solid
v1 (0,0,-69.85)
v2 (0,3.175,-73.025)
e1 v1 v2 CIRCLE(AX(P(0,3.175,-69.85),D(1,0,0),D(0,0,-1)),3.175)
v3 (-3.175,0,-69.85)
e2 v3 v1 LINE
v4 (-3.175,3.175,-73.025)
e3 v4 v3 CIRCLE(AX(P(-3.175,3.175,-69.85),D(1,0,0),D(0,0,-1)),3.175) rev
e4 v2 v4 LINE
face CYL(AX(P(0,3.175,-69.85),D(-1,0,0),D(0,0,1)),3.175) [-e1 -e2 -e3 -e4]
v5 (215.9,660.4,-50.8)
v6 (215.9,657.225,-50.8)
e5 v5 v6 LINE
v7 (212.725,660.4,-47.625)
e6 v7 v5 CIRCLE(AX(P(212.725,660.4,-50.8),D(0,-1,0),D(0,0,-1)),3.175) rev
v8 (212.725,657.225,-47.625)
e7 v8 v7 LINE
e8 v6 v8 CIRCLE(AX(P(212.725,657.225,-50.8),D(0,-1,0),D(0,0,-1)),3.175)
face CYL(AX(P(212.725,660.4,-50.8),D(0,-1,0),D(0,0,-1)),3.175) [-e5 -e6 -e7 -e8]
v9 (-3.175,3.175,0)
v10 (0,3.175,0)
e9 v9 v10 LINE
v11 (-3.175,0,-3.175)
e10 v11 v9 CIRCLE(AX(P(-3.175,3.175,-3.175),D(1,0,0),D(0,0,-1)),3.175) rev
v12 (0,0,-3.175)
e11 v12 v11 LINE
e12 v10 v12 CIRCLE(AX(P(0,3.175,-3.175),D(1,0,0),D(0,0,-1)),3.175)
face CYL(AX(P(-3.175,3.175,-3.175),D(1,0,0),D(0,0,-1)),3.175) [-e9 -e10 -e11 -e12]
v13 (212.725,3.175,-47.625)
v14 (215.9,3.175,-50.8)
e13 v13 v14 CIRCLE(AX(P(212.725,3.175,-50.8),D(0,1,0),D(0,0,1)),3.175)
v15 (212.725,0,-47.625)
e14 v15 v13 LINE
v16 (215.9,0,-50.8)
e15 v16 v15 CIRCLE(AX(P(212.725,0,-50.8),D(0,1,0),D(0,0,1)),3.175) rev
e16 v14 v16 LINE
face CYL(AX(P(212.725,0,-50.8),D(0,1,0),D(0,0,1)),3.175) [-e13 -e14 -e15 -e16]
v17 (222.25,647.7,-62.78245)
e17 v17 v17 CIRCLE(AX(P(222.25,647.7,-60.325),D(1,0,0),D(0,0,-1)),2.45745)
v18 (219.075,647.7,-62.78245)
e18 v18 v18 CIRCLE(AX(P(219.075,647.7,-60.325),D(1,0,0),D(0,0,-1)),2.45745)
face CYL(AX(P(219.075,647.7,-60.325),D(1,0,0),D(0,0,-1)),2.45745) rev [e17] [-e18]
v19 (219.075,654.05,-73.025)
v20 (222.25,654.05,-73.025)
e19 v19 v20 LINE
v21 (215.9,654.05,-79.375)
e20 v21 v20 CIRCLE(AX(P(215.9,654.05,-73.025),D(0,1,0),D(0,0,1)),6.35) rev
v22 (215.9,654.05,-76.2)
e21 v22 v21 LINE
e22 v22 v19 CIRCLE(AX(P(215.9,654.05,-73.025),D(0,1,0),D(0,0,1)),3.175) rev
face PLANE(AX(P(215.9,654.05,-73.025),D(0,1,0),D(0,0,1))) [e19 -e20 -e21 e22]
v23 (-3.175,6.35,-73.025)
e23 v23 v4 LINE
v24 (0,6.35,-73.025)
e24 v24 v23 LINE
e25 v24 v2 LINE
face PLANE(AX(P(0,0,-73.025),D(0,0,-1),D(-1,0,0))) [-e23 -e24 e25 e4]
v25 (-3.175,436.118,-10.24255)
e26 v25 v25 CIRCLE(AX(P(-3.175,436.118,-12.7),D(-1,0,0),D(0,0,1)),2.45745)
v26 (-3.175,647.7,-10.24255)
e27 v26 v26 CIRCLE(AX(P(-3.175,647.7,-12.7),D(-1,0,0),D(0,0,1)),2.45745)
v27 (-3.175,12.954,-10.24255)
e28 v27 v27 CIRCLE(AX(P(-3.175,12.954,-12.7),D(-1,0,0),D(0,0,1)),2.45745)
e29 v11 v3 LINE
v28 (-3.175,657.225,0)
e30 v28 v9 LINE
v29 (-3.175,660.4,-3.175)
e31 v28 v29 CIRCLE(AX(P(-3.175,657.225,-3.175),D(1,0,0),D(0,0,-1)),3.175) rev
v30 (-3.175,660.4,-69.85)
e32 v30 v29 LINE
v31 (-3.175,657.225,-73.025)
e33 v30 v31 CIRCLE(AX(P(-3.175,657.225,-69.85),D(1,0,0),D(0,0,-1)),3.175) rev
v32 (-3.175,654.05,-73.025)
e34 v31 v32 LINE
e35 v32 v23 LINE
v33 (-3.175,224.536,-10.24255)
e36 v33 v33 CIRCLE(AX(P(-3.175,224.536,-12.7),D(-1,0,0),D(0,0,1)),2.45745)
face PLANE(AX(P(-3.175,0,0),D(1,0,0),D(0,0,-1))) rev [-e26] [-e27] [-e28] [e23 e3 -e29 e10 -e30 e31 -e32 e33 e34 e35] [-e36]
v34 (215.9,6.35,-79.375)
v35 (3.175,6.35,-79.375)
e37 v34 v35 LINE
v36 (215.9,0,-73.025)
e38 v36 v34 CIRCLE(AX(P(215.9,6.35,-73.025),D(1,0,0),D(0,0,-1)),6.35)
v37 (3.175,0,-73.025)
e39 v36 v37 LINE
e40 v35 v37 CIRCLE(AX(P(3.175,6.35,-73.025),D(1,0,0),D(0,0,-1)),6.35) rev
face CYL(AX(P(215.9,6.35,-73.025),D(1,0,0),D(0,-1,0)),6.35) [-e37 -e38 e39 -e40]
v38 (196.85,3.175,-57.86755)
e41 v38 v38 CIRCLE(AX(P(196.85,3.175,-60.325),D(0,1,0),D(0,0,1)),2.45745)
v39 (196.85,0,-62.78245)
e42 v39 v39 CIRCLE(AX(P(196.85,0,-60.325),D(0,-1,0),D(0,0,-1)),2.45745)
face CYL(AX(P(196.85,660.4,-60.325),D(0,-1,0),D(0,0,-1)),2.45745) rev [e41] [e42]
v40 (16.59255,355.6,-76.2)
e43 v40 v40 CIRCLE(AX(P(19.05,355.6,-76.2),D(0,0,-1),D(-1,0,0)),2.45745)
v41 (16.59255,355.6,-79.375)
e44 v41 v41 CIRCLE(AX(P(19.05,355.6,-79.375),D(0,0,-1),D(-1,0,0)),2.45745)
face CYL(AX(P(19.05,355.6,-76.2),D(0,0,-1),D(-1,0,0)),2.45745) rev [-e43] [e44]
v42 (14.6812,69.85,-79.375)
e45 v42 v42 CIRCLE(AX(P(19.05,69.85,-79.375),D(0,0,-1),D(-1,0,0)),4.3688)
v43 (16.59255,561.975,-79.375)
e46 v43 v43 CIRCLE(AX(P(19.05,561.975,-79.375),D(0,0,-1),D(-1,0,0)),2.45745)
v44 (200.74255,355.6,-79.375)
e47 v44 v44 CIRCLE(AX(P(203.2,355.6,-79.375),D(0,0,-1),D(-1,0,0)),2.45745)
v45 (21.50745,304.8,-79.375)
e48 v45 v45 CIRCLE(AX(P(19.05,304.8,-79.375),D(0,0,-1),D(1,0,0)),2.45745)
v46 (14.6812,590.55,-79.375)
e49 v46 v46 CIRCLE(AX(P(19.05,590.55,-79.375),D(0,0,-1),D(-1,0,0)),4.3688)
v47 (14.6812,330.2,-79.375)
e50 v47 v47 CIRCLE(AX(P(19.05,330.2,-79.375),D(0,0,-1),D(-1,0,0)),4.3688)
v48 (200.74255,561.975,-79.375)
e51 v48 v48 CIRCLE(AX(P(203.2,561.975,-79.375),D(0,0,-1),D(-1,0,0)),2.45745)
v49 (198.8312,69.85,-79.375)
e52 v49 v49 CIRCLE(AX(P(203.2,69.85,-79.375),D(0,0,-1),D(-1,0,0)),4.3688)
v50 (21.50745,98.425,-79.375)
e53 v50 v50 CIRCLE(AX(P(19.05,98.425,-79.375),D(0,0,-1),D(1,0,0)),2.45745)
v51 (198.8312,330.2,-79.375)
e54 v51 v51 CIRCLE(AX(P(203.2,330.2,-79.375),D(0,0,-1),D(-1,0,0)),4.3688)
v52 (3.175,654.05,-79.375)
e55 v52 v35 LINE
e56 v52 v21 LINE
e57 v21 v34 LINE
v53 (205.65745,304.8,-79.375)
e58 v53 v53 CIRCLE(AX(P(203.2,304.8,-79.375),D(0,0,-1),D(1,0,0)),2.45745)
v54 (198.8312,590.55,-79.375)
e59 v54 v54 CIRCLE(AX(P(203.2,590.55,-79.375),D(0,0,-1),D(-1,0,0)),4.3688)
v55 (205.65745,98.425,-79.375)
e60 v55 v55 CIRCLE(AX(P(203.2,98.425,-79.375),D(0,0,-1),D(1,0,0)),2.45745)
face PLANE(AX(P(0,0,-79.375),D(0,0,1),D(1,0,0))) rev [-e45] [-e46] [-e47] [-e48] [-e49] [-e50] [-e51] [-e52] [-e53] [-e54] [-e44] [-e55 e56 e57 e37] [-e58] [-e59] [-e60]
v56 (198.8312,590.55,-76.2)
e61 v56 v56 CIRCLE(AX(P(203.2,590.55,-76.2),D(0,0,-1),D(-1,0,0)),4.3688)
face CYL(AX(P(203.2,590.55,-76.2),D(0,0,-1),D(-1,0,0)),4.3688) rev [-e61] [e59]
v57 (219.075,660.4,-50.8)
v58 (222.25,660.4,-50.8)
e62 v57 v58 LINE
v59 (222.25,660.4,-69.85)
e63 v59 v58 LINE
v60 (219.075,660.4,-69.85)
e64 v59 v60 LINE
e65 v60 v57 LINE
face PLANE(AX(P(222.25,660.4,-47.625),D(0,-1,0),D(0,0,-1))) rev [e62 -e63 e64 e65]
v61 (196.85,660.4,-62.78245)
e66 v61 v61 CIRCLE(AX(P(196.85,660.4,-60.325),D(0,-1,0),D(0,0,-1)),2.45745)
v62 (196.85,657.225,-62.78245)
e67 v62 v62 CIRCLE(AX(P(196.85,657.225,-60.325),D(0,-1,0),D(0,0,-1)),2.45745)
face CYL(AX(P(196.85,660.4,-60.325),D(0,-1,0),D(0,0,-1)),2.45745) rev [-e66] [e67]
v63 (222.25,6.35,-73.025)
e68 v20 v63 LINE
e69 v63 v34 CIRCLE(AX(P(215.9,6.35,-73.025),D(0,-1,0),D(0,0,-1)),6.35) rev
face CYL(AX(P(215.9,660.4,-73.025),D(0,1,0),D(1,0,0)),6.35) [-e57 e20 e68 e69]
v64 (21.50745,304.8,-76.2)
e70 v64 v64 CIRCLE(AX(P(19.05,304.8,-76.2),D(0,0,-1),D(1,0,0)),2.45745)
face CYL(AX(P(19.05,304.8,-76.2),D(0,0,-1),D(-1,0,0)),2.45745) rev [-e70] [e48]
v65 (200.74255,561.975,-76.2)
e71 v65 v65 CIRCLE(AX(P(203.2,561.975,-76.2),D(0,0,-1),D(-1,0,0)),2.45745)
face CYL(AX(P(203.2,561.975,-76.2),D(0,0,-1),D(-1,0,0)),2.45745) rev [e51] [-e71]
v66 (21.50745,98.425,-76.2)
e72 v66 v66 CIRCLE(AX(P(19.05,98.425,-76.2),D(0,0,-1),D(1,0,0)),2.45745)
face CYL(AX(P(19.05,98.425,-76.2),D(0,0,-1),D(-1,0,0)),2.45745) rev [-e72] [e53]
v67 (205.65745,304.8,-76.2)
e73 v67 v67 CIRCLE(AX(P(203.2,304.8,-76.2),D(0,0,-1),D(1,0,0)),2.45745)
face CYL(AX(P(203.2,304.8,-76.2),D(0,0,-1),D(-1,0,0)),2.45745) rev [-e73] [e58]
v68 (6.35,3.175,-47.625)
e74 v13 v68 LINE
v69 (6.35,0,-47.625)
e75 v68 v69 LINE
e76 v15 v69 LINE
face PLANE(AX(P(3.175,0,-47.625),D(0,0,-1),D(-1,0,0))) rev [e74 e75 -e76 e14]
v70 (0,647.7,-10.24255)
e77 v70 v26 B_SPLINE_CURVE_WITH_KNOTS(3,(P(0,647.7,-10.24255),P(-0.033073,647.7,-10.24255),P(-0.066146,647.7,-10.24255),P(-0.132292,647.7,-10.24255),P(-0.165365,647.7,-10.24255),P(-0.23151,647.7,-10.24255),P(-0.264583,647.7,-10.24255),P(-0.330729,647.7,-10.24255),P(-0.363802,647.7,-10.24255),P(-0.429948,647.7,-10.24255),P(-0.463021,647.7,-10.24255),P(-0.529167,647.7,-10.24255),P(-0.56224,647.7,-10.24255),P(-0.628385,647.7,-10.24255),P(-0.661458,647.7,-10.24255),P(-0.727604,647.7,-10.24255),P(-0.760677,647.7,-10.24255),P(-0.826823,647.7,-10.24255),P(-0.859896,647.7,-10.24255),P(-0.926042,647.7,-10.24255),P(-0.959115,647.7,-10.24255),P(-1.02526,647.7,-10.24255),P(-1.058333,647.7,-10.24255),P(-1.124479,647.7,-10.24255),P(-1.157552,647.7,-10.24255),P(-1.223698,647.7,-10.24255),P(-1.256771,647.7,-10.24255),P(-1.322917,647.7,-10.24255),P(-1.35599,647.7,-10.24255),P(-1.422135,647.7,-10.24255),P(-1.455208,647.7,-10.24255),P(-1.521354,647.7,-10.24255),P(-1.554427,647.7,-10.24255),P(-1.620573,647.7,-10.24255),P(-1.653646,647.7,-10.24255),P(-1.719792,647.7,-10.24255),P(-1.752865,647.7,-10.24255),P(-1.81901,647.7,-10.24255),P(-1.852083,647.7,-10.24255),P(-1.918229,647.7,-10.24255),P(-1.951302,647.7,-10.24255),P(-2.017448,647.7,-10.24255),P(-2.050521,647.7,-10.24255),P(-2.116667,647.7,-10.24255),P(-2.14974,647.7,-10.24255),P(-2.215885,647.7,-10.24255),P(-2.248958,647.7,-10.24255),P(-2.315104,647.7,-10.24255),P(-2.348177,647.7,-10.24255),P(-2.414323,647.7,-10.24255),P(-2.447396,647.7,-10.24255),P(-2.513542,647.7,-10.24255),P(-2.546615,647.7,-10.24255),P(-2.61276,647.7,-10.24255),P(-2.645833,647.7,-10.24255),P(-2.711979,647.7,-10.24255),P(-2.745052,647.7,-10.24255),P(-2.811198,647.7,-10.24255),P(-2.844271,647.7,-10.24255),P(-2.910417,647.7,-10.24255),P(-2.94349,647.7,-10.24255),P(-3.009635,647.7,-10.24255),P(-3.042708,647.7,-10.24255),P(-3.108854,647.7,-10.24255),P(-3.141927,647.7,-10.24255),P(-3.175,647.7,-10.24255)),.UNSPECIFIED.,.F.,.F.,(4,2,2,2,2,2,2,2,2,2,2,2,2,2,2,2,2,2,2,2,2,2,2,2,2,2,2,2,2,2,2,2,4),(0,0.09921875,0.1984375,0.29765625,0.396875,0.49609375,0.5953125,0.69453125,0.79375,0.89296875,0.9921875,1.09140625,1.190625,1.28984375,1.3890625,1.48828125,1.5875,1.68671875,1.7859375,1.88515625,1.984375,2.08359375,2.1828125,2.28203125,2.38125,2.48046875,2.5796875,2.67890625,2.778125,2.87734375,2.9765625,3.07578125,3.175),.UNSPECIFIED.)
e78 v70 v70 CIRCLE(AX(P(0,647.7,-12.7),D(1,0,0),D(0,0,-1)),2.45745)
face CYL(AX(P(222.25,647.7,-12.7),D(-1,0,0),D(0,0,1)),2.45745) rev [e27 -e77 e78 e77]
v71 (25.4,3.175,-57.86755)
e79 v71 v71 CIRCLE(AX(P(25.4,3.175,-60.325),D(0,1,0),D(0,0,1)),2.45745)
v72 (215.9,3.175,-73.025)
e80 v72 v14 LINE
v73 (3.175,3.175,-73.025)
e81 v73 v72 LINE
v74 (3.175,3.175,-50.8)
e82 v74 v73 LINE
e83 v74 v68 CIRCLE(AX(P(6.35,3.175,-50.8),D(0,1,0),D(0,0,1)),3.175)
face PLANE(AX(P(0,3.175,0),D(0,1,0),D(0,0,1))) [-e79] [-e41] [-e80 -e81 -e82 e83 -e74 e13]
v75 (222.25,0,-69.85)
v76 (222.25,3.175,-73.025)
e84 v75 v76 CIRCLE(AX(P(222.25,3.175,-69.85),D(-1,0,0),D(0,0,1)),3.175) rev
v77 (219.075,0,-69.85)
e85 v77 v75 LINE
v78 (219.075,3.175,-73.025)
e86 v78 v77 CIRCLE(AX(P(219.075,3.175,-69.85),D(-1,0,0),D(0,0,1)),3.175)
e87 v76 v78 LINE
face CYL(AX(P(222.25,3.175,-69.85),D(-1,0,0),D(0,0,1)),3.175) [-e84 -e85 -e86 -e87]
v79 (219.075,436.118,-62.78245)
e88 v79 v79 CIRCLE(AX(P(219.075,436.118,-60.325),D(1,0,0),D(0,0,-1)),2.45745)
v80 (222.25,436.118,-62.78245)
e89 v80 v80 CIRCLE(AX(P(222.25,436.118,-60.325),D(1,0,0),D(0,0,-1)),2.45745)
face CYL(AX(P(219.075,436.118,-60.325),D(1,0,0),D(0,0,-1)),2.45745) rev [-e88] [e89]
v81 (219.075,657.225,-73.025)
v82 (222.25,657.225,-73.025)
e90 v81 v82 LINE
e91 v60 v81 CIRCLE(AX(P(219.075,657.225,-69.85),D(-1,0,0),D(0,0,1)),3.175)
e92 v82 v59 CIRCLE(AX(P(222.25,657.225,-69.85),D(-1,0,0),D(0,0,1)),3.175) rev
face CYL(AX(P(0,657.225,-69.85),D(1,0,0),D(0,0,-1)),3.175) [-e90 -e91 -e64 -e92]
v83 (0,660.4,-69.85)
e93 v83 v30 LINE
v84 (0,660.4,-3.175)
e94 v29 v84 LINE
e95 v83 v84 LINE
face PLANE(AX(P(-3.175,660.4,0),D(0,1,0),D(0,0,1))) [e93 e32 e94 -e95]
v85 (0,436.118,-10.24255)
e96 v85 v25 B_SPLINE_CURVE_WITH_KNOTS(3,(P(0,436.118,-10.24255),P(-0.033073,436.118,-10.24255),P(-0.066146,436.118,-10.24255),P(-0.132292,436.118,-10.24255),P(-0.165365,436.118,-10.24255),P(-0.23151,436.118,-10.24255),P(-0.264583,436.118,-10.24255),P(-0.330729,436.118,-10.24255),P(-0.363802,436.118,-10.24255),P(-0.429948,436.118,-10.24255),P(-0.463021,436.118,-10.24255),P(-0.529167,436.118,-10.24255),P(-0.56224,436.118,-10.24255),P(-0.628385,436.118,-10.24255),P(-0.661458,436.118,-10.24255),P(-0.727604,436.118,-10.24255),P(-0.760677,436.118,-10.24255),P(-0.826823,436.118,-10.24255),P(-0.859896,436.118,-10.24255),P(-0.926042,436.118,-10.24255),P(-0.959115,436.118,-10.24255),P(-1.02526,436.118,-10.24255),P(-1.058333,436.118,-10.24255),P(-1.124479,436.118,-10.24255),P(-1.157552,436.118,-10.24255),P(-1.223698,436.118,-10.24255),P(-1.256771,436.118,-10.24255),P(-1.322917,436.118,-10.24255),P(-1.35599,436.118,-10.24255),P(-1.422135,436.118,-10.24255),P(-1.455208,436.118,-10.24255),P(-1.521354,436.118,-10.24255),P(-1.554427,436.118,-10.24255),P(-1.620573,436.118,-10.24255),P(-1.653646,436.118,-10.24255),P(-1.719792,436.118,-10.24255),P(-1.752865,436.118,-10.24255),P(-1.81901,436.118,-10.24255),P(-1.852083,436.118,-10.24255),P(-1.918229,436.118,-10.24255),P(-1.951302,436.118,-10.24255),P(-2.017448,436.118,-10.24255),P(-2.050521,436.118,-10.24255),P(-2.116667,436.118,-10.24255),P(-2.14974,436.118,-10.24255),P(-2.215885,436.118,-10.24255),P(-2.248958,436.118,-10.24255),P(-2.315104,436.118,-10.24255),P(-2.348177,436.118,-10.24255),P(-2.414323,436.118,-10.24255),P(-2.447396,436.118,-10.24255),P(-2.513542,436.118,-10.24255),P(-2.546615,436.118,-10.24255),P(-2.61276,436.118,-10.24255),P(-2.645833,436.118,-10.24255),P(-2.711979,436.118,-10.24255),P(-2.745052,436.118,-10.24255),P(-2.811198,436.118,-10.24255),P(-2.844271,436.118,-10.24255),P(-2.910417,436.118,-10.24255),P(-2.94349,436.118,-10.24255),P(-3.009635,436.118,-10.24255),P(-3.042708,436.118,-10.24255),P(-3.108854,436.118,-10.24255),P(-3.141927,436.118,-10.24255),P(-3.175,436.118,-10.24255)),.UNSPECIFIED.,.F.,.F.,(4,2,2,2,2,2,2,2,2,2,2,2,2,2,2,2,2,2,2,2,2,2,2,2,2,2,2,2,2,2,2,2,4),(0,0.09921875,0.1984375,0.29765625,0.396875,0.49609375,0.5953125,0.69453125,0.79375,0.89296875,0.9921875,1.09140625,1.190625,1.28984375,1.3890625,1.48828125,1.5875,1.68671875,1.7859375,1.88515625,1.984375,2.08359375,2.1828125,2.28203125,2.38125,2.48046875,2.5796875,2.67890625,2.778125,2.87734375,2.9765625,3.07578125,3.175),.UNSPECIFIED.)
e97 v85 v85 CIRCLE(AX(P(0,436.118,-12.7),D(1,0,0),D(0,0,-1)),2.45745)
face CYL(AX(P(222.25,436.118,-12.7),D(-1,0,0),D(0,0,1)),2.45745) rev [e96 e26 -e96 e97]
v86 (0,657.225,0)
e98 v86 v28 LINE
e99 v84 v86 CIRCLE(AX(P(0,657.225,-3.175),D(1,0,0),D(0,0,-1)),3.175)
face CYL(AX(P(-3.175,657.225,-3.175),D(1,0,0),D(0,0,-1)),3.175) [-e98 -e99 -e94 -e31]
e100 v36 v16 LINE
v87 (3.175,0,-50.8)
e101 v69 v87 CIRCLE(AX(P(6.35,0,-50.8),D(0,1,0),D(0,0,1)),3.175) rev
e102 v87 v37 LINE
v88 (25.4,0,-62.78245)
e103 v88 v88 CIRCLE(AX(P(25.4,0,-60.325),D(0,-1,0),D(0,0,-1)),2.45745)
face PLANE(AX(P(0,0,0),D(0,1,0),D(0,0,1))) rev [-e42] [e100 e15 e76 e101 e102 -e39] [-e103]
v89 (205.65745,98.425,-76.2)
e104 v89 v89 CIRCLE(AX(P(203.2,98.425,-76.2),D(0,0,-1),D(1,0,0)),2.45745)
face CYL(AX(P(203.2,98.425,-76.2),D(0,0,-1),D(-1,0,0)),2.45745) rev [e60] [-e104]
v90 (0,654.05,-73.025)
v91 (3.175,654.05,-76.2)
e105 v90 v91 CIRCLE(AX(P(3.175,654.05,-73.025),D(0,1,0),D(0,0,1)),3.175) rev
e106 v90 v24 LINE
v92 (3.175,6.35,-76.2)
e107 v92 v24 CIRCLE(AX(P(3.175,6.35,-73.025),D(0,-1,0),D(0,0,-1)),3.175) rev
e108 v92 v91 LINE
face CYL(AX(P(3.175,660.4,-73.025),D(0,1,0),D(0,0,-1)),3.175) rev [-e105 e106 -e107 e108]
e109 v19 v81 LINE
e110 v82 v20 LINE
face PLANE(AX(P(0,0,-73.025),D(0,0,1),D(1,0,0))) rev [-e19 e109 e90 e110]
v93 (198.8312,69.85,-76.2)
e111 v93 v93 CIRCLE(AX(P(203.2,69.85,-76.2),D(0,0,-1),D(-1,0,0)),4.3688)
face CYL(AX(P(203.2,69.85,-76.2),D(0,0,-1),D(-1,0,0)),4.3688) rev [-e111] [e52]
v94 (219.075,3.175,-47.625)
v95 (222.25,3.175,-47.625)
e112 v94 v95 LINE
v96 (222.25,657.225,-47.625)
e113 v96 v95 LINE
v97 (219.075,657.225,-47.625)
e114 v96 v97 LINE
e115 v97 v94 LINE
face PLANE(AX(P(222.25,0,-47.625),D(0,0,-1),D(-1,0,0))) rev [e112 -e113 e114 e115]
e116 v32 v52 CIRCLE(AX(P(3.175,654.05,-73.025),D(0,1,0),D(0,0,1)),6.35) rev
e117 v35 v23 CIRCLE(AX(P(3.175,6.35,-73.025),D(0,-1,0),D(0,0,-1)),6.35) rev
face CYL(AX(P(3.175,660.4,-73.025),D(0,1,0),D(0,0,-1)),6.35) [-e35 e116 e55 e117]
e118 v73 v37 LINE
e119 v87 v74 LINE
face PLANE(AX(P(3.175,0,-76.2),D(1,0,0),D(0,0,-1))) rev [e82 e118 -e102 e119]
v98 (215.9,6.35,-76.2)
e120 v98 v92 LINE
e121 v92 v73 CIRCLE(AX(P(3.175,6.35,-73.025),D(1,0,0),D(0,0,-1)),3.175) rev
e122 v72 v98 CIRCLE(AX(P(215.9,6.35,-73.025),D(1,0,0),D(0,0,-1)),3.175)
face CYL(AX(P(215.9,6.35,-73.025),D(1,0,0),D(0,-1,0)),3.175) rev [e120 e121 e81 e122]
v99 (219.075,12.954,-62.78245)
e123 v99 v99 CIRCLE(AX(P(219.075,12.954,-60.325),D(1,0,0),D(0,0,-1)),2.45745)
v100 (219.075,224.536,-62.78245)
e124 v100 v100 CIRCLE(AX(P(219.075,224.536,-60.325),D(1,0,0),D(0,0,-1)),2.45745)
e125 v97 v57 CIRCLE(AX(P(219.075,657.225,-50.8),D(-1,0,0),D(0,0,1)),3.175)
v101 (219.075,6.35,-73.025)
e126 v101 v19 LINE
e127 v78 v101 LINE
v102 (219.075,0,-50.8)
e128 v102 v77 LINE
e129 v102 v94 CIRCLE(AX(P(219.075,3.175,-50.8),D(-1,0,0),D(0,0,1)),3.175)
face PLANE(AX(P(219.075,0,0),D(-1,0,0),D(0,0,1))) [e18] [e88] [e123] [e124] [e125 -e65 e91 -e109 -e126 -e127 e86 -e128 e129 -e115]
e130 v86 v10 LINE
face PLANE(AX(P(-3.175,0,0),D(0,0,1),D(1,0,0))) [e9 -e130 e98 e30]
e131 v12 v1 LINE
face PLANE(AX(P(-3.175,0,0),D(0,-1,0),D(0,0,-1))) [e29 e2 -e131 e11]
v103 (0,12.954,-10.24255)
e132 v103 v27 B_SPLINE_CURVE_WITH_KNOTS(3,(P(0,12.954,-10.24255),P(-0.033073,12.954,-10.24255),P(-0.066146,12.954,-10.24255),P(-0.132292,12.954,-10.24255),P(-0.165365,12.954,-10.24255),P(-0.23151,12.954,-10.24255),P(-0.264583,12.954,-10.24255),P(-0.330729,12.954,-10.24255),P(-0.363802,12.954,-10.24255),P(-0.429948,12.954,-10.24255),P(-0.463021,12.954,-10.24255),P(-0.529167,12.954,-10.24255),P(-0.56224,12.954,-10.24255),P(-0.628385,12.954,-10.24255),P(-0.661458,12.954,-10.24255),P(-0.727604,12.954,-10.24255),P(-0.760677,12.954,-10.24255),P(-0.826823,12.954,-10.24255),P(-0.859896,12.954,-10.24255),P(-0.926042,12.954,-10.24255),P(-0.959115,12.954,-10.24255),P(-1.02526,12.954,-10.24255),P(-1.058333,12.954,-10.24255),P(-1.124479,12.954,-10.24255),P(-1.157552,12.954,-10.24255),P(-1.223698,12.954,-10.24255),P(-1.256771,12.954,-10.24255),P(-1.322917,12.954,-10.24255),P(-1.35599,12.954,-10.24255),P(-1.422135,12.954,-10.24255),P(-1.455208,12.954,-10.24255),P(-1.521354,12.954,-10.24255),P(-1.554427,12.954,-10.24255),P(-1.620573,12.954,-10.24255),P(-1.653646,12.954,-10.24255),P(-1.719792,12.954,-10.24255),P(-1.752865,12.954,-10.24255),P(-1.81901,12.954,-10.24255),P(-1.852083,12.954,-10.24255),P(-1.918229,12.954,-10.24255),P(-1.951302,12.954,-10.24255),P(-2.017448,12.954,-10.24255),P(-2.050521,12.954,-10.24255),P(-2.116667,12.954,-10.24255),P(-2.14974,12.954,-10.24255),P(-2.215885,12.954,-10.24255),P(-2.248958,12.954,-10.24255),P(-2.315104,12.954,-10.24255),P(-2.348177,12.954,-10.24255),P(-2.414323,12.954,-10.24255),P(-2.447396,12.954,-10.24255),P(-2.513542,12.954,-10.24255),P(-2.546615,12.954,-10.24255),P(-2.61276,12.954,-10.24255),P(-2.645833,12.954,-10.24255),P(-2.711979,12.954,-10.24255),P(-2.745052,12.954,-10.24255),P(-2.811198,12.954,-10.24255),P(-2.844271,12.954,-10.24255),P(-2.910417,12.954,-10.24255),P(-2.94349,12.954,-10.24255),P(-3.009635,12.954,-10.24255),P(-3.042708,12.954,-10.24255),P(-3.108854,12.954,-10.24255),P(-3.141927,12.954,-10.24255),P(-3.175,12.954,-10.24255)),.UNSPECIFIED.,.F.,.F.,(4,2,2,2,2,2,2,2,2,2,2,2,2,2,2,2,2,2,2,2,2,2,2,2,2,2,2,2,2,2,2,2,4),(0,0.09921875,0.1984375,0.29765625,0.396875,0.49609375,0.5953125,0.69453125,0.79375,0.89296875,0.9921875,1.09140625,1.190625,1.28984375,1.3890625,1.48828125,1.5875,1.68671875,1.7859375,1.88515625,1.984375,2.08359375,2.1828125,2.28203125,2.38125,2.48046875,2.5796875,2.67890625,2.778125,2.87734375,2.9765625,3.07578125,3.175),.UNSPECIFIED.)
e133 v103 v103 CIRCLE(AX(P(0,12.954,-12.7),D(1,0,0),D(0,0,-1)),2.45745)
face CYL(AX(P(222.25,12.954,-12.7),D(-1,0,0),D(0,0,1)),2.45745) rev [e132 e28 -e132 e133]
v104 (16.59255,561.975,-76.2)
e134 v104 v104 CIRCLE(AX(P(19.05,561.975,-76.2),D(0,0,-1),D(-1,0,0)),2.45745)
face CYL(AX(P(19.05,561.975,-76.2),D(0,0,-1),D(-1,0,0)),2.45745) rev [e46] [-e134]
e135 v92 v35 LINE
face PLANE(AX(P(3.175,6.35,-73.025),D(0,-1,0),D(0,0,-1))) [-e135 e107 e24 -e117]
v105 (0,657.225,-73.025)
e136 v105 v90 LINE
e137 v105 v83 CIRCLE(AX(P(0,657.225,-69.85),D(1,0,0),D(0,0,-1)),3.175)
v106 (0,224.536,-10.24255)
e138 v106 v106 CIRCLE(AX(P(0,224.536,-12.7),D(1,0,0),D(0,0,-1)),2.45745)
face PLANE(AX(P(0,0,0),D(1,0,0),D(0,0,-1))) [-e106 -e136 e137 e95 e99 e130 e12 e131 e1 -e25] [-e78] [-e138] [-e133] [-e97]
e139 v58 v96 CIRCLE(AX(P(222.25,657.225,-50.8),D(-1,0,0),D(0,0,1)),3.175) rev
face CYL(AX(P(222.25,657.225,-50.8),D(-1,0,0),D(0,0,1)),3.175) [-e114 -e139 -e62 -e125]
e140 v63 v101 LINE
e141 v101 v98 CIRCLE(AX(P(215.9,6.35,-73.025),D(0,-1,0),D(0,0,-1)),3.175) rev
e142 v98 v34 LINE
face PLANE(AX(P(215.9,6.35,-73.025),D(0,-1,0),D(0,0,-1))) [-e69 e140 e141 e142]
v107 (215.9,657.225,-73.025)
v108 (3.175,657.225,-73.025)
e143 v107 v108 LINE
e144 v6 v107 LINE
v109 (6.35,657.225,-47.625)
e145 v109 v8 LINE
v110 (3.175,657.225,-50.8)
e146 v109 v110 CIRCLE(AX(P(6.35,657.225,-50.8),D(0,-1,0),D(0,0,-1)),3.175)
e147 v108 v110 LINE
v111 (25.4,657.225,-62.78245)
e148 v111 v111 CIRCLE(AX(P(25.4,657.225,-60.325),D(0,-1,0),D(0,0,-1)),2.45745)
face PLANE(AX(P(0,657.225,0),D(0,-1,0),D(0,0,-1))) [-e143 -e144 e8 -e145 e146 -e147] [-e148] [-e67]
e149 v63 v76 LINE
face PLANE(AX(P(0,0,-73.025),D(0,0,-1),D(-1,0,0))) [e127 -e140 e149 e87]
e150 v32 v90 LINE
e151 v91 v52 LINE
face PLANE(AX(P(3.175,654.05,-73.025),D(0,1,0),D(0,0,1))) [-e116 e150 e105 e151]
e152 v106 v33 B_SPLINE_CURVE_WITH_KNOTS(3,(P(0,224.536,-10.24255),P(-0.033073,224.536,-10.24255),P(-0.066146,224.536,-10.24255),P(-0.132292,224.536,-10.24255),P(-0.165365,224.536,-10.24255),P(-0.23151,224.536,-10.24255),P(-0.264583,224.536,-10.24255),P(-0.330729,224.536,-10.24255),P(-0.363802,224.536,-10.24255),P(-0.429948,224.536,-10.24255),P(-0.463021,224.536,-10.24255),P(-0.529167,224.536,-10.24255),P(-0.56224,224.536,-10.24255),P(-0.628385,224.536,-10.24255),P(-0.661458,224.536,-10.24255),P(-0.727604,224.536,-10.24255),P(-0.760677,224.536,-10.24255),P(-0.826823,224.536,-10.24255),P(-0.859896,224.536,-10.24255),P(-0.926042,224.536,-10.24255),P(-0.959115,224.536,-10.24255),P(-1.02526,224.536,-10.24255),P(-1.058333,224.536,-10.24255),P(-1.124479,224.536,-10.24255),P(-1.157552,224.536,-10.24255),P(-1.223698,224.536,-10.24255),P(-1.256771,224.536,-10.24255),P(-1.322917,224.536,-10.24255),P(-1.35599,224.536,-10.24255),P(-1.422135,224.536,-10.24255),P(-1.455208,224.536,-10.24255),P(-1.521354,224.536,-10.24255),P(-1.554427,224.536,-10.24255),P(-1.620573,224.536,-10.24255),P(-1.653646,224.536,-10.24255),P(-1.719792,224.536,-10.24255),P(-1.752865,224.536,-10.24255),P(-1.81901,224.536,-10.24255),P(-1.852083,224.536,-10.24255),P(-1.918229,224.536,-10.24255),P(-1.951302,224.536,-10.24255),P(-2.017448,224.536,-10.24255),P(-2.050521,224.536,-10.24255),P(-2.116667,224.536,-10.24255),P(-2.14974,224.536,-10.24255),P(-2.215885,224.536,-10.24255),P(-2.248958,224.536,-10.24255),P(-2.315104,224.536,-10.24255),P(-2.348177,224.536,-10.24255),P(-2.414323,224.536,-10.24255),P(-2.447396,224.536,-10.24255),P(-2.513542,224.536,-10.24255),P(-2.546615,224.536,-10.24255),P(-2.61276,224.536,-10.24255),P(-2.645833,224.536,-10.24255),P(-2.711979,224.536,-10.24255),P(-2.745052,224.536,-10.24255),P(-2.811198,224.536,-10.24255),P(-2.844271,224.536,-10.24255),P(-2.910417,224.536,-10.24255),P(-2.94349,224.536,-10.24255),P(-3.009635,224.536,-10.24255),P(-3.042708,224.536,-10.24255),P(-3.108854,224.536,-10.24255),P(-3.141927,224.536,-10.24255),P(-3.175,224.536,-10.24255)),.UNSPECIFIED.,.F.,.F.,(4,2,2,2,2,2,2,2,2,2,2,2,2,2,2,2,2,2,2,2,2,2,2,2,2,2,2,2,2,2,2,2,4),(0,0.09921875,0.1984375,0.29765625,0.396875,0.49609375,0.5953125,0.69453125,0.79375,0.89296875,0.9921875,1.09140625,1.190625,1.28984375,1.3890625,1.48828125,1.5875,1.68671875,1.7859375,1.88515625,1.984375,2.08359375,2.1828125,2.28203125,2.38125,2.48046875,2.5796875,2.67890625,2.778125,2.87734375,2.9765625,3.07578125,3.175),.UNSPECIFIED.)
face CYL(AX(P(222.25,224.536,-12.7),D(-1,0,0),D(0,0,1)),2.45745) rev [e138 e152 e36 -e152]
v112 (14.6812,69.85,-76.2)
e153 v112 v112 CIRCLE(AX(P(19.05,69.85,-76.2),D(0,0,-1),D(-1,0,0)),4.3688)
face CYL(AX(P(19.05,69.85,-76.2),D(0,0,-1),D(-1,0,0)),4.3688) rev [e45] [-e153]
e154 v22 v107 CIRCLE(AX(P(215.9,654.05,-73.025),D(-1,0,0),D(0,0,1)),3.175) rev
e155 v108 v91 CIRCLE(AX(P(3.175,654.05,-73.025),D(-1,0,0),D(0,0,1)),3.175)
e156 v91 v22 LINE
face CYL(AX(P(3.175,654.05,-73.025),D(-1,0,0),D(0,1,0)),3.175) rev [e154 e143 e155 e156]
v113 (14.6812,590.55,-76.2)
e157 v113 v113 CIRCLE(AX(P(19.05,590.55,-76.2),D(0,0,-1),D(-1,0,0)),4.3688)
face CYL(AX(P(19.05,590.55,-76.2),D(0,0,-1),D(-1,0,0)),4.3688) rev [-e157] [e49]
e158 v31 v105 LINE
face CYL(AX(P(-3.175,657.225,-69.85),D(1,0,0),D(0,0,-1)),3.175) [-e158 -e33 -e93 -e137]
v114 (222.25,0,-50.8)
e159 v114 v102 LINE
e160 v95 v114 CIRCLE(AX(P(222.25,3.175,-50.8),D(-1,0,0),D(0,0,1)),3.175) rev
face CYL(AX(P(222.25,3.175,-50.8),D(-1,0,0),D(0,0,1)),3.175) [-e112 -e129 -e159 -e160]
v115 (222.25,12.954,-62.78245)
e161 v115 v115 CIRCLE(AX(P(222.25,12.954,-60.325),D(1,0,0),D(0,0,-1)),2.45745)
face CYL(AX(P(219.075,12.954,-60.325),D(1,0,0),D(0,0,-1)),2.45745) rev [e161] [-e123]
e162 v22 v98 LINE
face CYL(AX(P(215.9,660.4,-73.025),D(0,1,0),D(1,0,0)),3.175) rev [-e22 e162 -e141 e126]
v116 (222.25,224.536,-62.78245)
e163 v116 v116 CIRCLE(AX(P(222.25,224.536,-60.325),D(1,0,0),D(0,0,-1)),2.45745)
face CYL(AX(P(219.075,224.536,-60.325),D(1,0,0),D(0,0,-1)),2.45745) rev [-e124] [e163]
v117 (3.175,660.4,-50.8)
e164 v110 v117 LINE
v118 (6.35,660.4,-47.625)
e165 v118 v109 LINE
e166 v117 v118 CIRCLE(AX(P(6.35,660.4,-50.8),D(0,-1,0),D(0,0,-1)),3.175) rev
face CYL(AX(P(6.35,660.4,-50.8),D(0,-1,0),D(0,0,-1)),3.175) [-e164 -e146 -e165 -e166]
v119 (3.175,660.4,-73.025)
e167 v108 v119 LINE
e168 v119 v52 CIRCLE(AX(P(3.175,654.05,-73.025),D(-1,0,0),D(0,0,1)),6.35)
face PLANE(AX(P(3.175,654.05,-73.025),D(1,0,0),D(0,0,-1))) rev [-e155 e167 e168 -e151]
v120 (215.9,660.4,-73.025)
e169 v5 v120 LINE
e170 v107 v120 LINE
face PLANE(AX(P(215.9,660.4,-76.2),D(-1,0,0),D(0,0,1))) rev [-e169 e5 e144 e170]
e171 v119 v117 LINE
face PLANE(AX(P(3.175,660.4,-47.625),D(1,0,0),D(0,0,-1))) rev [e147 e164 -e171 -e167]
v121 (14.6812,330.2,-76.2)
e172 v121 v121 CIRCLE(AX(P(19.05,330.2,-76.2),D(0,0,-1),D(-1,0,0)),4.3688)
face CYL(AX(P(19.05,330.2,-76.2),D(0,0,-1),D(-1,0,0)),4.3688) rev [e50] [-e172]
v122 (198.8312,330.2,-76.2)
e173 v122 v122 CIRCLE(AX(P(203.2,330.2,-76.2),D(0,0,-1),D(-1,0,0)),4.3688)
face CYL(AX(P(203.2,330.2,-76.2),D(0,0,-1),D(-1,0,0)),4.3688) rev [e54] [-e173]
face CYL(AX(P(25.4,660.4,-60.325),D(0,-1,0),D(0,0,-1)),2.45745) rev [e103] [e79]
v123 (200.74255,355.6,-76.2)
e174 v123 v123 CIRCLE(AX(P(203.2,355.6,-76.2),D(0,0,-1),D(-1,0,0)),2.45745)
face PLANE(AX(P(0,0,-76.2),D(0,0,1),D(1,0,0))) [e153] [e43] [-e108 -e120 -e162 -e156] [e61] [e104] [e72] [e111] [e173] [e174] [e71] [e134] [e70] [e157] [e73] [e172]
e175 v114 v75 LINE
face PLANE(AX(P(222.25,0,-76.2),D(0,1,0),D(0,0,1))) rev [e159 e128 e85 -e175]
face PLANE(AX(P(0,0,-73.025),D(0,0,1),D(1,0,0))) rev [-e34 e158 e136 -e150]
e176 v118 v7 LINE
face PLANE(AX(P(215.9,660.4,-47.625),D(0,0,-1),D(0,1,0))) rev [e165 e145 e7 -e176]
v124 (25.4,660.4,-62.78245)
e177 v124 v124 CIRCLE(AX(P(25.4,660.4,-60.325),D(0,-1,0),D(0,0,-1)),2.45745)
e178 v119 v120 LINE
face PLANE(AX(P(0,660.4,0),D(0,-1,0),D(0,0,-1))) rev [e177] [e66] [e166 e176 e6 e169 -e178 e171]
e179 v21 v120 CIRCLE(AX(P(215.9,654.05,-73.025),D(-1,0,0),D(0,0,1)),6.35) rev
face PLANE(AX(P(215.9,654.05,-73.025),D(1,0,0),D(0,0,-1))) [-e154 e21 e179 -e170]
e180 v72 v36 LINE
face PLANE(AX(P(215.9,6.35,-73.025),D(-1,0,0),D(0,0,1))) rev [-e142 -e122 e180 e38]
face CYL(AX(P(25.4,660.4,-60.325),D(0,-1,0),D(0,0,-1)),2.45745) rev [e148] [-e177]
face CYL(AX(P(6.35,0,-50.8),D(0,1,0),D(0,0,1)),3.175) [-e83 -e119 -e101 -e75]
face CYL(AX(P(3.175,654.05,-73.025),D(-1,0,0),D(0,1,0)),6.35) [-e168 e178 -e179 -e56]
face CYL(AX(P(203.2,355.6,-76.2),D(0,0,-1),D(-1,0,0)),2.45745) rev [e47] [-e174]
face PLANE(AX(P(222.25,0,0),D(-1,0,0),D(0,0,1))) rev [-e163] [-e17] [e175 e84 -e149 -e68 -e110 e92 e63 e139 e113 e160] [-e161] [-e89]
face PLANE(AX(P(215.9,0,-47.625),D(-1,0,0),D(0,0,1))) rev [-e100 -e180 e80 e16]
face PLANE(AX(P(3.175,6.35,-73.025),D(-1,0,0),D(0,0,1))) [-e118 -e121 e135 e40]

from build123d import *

# Parameters (mm, degrees)
SKETCH1_W                    = 79.375
SKETCH1_H                    = 660.4
BASE_FLANGE1_DEPTH           = 3.175
EDGE_FLANGE1_STRIP_W         = 19.05
EDGE_FLANGE1_STRIP_H         = 3.175
EDGE_FLANGE1_STRIP_CUT_DEPTH = 660.4
EDGE_FLANGE1_DEPTH           = 660.4
EDGE_FLANGE3_STRIP_W         = 19.05
EDGE_FLANGE3_STRIP_H         = 3.175
EDGE_FLANGE3_STRIP_CUT_DEPTH = 660.4
EDGE_FLANGE3_DEPTH           = 660.4
SKETCH21_R                   = 2.45745
CUT_EXTRUDE2_DEPTH           = 703.314018976
SKETCH24_R                   = 2.45745
CUT_EXTRUDE3_DEPTH           = 3.175
SKETCH25_R                   = 4.3688
SKETCH25_R_2                 = 2.45745
CUT_EXTRUDE4_DEPTH           = 3.175
EDGE_FLANGE4_START           = -3.175
EDGE_FLANGE4_DEPTH           = 225.425
EDGE_FLANGE4_2_DEPTH         = 6.35
EDGE_FLANGE4_START_2         = 215.9
EDGE_FLANGE4_3_DEPTH         = 6.35
EDGE_FLANGE4_START_3         = 3.175
EDGE_FLANGE4_4_DEPTH         = 212.725
EDGE_FLANGE5_START           = -3.175
EDGE_FLANGE5_DEPTH           = 225.425
EDGE_FLANGE5_2_DEPTH         = 6.35
EDGE_FLANGE5_START_2         = 215.9
EDGE_FLANGE5_3_DEPTH         = 6.35
EDGE_FLANGE5_START_3         = 3.175
EDGE_FLANGE5_4_DEPTH         = 212.725
SKETCH32_R                   = 2.45745
CUT_EXTRUDE5_DEPTH           = 702.301371113
FILLET1_R                    = 3.175


# Read off the part's stored shape, not the designer's step: Edge-Flange4, Edge-Flange5
# Sheet-metal steps are written as plain solids
with BuildPart() as part:
    # Sketch1 → Base-Flange1 (new body)
    with BuildSketch(Plane(origin=(0, 0, 0), x_dir=(0, 0, -1), z_dir=(1, 0, 0))):
        with Locations((39.6875, 330.2)):
            Rectangle(SKETCH1_W, SKETCH1_H)
    extrude(amount=-BASE_FLANGE1_DEPTH)

    # Edge-Flange1 strip (across the edge) → Edge-Flange1 strip cut (cut)
    with BuildSketch(Plane(origin=(0, 0, -79.375), x_dir=(0, 0, 1), z_dir=(0, 1, 0))):
        with Locations((-3.175, -1.5875)):
            Rectangle(EDGE_FLANGE1_STRIP_W, EDGE_FLANGE1_STRIP_H)
    extrude(amount=EDGE_FLANGE1_STRIP_CUT_DEPTH, mode=Mode.SUBTRACT)

    # Edge-Flange1 section (across the edge) → Edge-Flange1 (add)
    with BuildSketch(Plane(origin=(0, 0, -79.375), x_dir=(0, 0, 1), z_dir=(0, 1, 0))):
        with BuildLine():
            Line((0, 3.175), (0, 222.25))
            Line((0, 222.25), (3.175, 222.25))
            Line((3.175, 222.25), (3.175, 3.175))
            ThreePointArc((3.175, 3.175), (4.10493597, 0.92993597), (6.35, 0))
            Line((6.35, 0), (6.35, -3.175))
            ThreePointArc((6.35, -3.175), (1.859871939, -1.315128061), (0, 3.175))
        make_face()
    extrude(amount=EDGE_FLANGE1_DEPTH)

    # Edge-Flange3 strip (across the edge) → Edge-Flange3 strip cut (cut)
    with BuildSketch(Plane(origin=(222.25, 0, -76.2), x_dir=(-1, 0, 0), z_dir=(0, 1, 0))):
        with Locations((-3.175, -1.5875)):
            Rectangle(EDGE_FLANGE3_STRIP_W, EDGE_FLANGE3_STRIP_H)
    extrude(amount=EDGE_FLANGE3_STRIP_CUT_DEPTH, mode=Mode.SUBTRACT)

    # Edge-Flange3 section (across the edge) → Edge-Flange3 (add)
    with BuildSketch(Plane(origin=(222.25, 0, -76.2), x_dir=(-1, 0, 0), z_dir=(0, 1, 0))):
        with BuildLine():
            Line((0, 3.175), (0, 28.575))
            Line((0, 28.575), (3.175, 28.575))
            Line((3.175, 28.575), (3.175, 3.175))
            ThreePointArc((3.175, 3.175), (4.10493597, 0.92993597), (6.35, 0))
            Line((6.35, 0), (6.35, -3.175))
            ThreePointArc((6.35, -3.175), (1.859871939, -1.315128061), (0, 3.175))
        make_face()
    extrude(amount=EDGE_FLANGE3_DEPTH)

    # Sketch21 → Cut-Extrude2 (cut, through all)
    with BuildSketch(Plane.ZY.offset(3.175)):
        with Locations((-12.7, 647.7)):
            Circle(SKETCH21_R)
        with Locations((-12.7, 436.118)):
            Circle(SKETCH21_R)
        with Locations((-12.7, 224.536)):
            Circle(SKETCH21_R)
        with Locations((-12.7, 12.954)):
            Circle(SKETCH21_R)
    extrude(amount=-CUT_EXTRUDE2_DEPTH, mode=Mode.SUBTRACT)

    # Sketch24 → Cut-Extrude3 (cut)
    with BuildSketch(Plane(origin=(222.25, 0, 0), x_dir=(0, 0, -1), z_dir=(1, 0, 0))):
        with Locations((60.325, 647.7)):
            Circle(SKETCH24_R)
        with Locations((60.325, 436.118)):
            Circle(SKETCH24_R)
        with Locations((60.325, 224.536)):
            Circle(SKETCH24_R)
        with Locations((60.325, 12.954)):
            Circle(SKETCH24_R)
    extrude(amount=-CUT_EXTRUDE3_DEPTH, mode=Mode.SUBTRACT)

    # Sketch25 → Cut-Extrude4 (cut)
    with BuildSketch(Plane(origin=(0, 0, -79.375), x_dir=(-1, 0, 0), z_dir=(0, 0, -1))):
        with Locations((-203.2, 590.55)):
            Circle(SKETCH25_R)
        with Locations((-19.05, 590.55)):
            Circle(SKETCH25_R)
        with Locations((-19.05, 330.2)):
            Circle(SKETCH25_R)
        with Locations((-203.2, 330.2)):
            Circle(SKETCH25_R)
        with Locations((-19.05, 561.975)):
            Circle(SKETCH25_R_2)
        with Locations((-203.2, 561.975)):
            Circle(SKETCH25_R_2)
        with Locations((-203.2, 355.6)):
            Circle(SKETCH25_R_2)
        with Locations((-19.05, 355.6)):
            Circle(SKETCH25_R_2)
        with Locations(Location((-203.2, 304.8, 0), (0, 0, 180))):
            Circle(SKETCH25_R_2)
        with Locations(Location((-19.05, 304.8, 0), (0, 0, 180))):
            Circle(SKETCH25_R_2)
        with Locations(Location((-19.05, 98.425, 0), (0, 0, 180))):
            Circle(SKETCH25_R_2)
        with Locations(Location((-203.2, 98.425, 0), (0, 0, 180))):
            Circle(SKETCH25_R_2)
        with Locations((-203.2, 69.85)):
            Circle(SKETCH25_R)
        with Locations((-19.05, 69.85)):
            Circle(SKETCH25_R)
    extrude(amount=-CUT_EXTRUDE4_DEPTH, mode=Mode.SUBTRACT)

    # Edge-Flange4 outline → Edge-Flange4 (cut)
    with BuildSketch(Plane.YZ.offset(EDGE_FLANGE4_START)):
        with BuildLine():
            ThreePointArc((660.4, -73.025), (658.540128061, -77.515128061), (654.05, -79.375))
            Line((654.05, -79.375), (660.4, -79.375))
            Line((660.4, -79.375), (660.4, -73.025))
        make_face()
        with BuildLine():
            ThreePointArc((654.05, -76.2), (656.29506403, -75.27006403), (657.225, -73.025))
            Line((657.225, -73.025), (654.05, -73.025))
            Line((654.05, -73.025), (654.05, -76.2))
        make_face()
    extrude(amount=EDGE_FLANGE4_DEPTH, mode=Mode.SUBTRACT)

    # Edge-Flange4 2 outline → Edge-Flange4 2 (cut)
    with BuildSketch(Plane.YZ.offset(EDGE_FLANGE4_START)):
        with BuildLine():
            Line((660.4, -73.025), (657.225, -73.025))
            ThreePointArc((657.225, -73.025), (656.29506403, -75.27006403), (654.05, -76.2))
            Line((654.05, -76.2), (654.05, -79.375))
            ThreePointArc((654.05, -79.375), (658.540128061, -77.515128061), (660.4, -73.025))
        make_face()
    extrude(amount=EDGE_FLANGE4_2_DEPTH, mode=Mode.SUBTRACT)

    # Edge-Flange4 3 outline → Edge-Flange4 3 (cut)
    with BuildSketch(Plane.YZ.offset(EDGE_FLANGE4_START_2)):
        with BuildLine():
            Line((660.4, -73.025), (657.225, -73.025))
            ThreePointArc((657.225, -73.025), (656.29506403, -75.27006403), (654.05, -76.2))
            Line((654.05, -76.2), (654.05, -79.375))
            ThreePointArc((654.05, -79.375), (658.540128061, -77.515128061), (660.4, -73.025))
        make_face()
    extrude(amount=EDGE_FLANGE4_3_DEPTH, mode=Mode.SUBTRACT)

    # Edge-Flange4 4 outline → Edge-Flange4 4 (add)
    with BuildSketch(Plane.YZ.offset(EDGE_FLANGE4_START_3)):
        with BuildLine():
            ThreePointArc((659.549261315, -76.2), (660.183628997, -74.668500936), (660.4, -73.025))
            Line((660.4, -73.025), (660.4, -47.625))
            Line((660.4, -47.625), (657.225, -47.625))
            Line((657.225, -47.625), (657.225, -73.025))
            ThreePointArc((657.225, -73.025), (656.29506403, -75.27006403), (654.05, -76.2))
            Line((654.05, -76.2), (659.549261315, -76.2))
        make_face()
    extrude(amount=EDGE_FLANGE4_4_DEPTH)

    # Edge-Flange5 outline → Edge-Flange5 (cut)
    with BuildSketch(Plane.YZ.offset(EDGE_FLANGE5_START)):
        with BuildLine():
            Line((0, -73.025), (0, -79.375))
            Line((0, -79.375), (6.35, -79.375))
            ThreePointArc((6.35, -79.375), (1.859871939, -77.515128061), (0, -73.025))
        make_face()
        with BuildLine():
            Line((6.35, -73.025), (3.175, -73.025))
            ThreePointArc((3.175, -73.025), (4.10493597, -75.27006403), (6.35, -76.2))
            Line((6.35, -76.2), (6.35, -73.025))
        make_face()
    extrude(amount=EDGE_FLANGE5_DEPTH, mode=Mode.SUBTRACT)

    # Edge-Flange5 2 outline → Edge-Flange5 2 (cut)
    with BuildSketch(Plane.YZ.offset(EDGE_FLANGE5_START)):
        with BuildLine():
            Line((3.175, -73.025), (0, -73.025))
            ThreePointArc((0, -73.025), (1.859871939, -77.515128061), (6.35, -79.375))
            Line((6.35, -79.375), (6.35, -76.2))
            ThreePointArc((6.35, -76.2), (4.10493597, -75.27006403), (3.175, -73.025))
        make_face()
    extrude(amount=EDGE_FLANGE5_2_DEPTH, mode=Mode.SUBTRACT)

    # Edge-Flange5 3 outline → Edge-Flange5 3 (cut)
    with BuildSketch(Plane.YZ.offset(EDGE_FLANGE5_START_2)):
        with BuildLine():
            Line((3.175, -73.025), (0, -73.025))
            ThreePointArc((0, -73.025), (1.859871939, -77.515128061), (6.35, -79.375))
            Line((6.35, -79.375), (6.35, -76.2))
            ThreePointArc((6.35, -76.2), (4.10493597, -75.27006403), (3.175, -73.025))
        make_face()
    extrude(amount=EDGE_FLANGE5_3_DEPTH, mode=Mode.SUBTRACT)

    # Edge-Flange5 4 outline → Edge-Flange5 4 (add)
    with BuildSketch(Plane.YZ.offset(EDGE_FLANGE5_START_3)):
        with BuildLine():
            Line((0, -47.625), (0, -73.025))
            ThreePointArc((0, -73.025), (0.216371003, -74.668500936), (0.850738685, -76.2))
            Line((0.850738685, -76.2), (6.35, -76.2))
            ThreePointArc((6.35, -76.2), (4.10493597, -75.27006403), (3.175, -73.025))
            Line((3.175, -73.025), (3.175, -47.625))
            Line((3.175, -47.625), (0, -47.625))
        make_face()
    extrude(amount=EDGE_FLANGE5_4_DEPTH)

    # Sketch32 → Cut-Extrude5 (cut, through all)
    with BuildSketch(Plane.XZ):
        with Locations(Location((25.4, -60.325, 0), (0, 0, 270))):
            Circle(SKETCH32_R)
        with Locations(Location((196.85, -60.325, 0), (0, 0, 270))):
            Circle(SKETCH32_R)
    extrude(amount=-CUT_EXTRUDE5_DEPTH, mode=Mode.SUBTRACT)

    # Fillet1
    fillet1_edges = [part.edges().sort_by_distance(p)[0] for p in [
        (220.6625, 0, -47.625),
        (215.9, 1.5875, -47.625),
        (220.6625, 0, -73.025),
        (-1.5875, 0, 0),
        (3.175, 1.5875, -47.625),
        (-1.5875, 0, -73.025),
        (-1.5875, 660.4, -73.025),
        (-1.5875, 660.4, 0),
        (3.175, 658.8125, -47.625),
        (220.6625, 660.4, -73.025),
        (215.9, 658.8125, -47.625),
        (220.6625, 660.4, -47.625),
    ]]
    fillet(fillet1_edges, radius=FILLET1_R)


solid = part.part
